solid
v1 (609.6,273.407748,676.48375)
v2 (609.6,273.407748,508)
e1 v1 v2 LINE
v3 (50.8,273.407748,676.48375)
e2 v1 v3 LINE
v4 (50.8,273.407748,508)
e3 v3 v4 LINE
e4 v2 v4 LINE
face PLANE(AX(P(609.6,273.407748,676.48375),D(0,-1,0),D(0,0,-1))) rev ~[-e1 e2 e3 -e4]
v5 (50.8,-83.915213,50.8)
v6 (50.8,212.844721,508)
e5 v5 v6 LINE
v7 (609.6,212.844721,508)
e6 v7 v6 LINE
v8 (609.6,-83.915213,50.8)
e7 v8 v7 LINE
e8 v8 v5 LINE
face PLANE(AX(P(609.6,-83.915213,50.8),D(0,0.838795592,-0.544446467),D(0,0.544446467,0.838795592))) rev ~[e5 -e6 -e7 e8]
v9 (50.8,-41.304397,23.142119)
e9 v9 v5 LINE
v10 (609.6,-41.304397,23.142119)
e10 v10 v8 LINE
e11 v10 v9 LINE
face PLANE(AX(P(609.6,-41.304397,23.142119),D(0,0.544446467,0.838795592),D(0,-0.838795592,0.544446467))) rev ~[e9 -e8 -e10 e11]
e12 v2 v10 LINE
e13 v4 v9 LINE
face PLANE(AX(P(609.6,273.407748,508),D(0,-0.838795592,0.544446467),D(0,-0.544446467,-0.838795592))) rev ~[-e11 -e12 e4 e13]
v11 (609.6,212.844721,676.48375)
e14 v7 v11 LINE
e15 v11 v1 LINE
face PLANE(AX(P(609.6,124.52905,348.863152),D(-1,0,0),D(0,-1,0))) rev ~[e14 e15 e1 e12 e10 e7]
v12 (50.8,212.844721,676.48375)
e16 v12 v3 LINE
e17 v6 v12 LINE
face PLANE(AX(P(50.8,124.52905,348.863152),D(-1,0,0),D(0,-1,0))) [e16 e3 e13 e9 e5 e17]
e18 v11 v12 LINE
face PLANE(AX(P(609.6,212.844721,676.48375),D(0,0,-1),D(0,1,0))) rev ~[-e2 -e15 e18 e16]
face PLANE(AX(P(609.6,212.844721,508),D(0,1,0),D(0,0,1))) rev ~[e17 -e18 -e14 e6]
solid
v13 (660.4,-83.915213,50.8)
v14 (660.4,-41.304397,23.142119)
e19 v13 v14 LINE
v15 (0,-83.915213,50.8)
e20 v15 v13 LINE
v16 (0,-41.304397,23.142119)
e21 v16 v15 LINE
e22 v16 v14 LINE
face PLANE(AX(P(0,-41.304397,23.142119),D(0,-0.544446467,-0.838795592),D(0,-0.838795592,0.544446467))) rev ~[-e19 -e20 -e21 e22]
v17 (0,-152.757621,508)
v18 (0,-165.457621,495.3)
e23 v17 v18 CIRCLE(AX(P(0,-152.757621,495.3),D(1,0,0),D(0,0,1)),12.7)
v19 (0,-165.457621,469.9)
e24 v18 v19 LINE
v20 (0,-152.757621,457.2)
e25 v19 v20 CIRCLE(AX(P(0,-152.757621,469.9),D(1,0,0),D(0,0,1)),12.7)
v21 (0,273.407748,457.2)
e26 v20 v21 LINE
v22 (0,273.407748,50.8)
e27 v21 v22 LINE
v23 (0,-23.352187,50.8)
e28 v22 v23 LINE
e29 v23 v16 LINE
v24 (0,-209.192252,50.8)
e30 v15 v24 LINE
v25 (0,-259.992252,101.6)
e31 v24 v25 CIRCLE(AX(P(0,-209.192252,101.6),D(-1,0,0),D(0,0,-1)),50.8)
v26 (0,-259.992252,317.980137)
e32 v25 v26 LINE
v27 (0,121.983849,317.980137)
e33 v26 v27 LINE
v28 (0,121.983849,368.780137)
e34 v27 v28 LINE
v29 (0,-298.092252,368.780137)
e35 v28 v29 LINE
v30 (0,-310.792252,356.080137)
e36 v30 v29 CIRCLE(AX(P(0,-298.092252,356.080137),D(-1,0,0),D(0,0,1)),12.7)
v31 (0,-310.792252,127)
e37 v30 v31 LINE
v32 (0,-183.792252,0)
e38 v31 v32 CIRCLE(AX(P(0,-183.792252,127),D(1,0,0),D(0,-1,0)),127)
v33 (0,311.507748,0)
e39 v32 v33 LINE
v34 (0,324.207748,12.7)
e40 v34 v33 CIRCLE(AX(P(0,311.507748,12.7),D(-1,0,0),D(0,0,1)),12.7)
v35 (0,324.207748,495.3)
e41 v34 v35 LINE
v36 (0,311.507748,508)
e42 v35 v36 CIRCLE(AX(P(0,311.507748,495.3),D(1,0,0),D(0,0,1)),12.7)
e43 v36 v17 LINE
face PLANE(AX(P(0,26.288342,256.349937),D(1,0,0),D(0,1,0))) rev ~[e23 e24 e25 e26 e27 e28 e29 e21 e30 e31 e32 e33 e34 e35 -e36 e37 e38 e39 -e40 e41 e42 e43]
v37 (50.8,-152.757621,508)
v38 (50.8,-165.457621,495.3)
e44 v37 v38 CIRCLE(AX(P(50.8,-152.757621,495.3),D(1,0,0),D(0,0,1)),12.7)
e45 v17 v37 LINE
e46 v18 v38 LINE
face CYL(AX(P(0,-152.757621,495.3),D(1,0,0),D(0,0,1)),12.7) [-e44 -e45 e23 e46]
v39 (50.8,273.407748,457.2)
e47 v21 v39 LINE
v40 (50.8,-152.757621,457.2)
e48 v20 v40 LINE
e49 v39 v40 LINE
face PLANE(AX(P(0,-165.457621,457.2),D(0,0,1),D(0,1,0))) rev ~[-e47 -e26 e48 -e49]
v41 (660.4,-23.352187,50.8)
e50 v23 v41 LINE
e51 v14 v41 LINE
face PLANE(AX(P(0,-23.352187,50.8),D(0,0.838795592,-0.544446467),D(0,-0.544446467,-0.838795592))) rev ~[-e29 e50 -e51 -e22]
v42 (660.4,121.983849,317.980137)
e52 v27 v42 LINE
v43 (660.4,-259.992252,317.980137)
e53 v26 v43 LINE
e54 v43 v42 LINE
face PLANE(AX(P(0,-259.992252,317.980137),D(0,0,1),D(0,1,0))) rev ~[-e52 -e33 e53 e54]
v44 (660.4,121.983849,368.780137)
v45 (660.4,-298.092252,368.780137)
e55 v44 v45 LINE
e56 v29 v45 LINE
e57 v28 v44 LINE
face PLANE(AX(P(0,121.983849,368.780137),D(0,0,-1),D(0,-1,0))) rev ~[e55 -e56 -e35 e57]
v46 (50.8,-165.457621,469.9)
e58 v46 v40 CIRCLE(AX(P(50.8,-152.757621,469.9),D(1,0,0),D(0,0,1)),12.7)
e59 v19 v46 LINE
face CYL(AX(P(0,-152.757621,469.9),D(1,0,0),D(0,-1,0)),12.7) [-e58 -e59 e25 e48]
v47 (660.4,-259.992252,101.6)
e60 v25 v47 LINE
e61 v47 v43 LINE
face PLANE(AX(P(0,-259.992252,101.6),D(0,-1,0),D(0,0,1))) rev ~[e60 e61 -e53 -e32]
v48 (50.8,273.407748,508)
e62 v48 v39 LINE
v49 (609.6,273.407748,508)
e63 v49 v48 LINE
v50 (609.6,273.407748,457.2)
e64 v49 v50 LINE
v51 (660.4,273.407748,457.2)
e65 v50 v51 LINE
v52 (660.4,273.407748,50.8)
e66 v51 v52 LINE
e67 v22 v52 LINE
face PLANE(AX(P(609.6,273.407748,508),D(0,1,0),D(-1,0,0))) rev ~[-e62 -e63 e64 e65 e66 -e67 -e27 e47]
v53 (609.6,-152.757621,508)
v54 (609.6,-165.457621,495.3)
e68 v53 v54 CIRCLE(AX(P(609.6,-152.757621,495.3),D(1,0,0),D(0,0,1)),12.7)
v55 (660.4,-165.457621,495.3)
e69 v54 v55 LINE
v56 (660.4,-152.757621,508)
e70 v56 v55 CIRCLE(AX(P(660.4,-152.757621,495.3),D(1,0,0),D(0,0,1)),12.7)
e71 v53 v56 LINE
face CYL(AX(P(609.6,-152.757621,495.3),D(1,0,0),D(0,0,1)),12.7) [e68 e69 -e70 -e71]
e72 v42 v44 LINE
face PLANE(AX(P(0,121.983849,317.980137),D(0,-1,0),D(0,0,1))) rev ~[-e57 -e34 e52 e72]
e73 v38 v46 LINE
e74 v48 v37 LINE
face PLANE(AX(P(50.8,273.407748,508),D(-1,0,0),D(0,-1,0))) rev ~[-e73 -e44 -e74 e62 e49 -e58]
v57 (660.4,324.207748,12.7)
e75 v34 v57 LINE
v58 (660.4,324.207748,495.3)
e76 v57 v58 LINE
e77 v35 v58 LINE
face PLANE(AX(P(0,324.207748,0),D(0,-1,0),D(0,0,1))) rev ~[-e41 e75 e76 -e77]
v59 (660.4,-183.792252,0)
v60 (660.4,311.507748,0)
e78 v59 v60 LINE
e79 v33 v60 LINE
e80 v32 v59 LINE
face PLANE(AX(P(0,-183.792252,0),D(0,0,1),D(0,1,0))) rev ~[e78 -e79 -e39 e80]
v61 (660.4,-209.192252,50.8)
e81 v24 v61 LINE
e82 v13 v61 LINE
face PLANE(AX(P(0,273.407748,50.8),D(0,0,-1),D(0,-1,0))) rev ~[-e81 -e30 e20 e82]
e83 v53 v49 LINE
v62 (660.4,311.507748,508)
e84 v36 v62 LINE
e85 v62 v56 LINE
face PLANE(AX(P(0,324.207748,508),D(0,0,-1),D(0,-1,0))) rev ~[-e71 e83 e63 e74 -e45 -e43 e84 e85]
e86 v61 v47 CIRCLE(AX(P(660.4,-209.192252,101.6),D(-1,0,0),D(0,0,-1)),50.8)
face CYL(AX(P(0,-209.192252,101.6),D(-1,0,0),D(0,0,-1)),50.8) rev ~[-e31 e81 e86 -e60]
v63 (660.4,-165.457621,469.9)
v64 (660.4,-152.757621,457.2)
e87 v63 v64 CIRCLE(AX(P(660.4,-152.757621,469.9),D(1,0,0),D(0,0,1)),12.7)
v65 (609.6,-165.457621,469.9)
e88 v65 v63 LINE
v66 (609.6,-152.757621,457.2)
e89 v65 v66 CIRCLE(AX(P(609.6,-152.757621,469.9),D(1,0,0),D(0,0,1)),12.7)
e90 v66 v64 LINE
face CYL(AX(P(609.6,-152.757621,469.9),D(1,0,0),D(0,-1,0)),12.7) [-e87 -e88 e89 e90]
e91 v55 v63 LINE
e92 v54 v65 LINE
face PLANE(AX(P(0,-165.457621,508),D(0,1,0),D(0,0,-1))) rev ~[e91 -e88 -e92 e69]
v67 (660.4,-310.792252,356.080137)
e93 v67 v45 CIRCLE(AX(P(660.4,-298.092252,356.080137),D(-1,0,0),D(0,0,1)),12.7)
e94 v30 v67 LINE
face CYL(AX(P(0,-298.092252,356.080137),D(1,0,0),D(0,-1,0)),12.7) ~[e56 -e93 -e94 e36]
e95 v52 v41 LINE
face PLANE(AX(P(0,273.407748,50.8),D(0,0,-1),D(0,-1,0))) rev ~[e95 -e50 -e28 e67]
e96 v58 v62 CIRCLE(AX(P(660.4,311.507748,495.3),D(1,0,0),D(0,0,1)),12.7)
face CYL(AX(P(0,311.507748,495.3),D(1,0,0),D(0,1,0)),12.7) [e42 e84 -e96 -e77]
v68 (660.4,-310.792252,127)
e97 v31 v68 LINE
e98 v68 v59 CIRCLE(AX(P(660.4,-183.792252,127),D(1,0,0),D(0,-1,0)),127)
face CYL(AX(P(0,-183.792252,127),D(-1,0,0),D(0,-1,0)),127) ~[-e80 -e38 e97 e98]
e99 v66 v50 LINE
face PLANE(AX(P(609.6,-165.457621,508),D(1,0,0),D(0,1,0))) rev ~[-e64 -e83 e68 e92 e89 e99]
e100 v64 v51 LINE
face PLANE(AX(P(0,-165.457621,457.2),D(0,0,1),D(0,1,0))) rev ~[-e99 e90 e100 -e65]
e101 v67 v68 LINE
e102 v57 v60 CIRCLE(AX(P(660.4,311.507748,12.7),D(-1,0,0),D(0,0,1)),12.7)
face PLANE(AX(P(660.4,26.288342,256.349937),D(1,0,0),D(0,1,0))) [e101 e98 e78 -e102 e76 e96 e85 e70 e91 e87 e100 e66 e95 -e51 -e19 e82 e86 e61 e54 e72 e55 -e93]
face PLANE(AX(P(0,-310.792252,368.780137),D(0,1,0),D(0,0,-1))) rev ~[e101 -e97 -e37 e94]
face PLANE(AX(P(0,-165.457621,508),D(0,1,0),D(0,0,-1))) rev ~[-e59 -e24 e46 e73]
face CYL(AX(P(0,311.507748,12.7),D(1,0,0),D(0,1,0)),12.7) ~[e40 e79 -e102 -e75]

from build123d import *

# Parameters (mm, degrees)
F1_DEPTH = 660.4
F3_DEPTH = 86.54255
F5_DEPTH = 558.8
F7_DEPTH = 762
F8_R     = 12.7


# Not quite as in the source:
# - a feature of the source that left no trace in its solid (it failed there, or was rolled back) is left out


with BuildPart() as f1:
    # F0 (on Right) → F1 (new body)
    with BuildSketch(Plane.YZ):
        with BuildLine():
            Line((324.2077479366, 0), (324.2077479366, 508))
            Line((324.2077479366, 508), (-165.4576212168, 508))
            Line((-165.4576212168, 508), (-165.4576212168, 457.2))
            Line((-165.4576212168, 457.2), (273.4077479366, 457.2))
            Line((273.4077479366, 457.2), (273.4077479366, 50.8))
            Line((273.4077479366, 50.8), (-209.1922520634, 50.8))
            ThreePointArc((-209.1922520634, 50.8), (-245.1132765477, 65.6789755157), (-259.9922520634, 101.6))
            Line((-259.9922520634, 101.6), (-259.9922520634, 317.9801367223))
            Line((-259.9922520634, 317.9801367223), (121.9838493824, 317.9801367223))
            Line((121.9838493824, 317.9801367223), (121.9838493824, 368.7801367223))
            Line((121.9838493824, 368.7801367223), (-310.7922520634, 368.7801367223))
            Line((-310.7922520634, 368.7801367223), (-310.7922520634, 127))
            ThreePointArc((-310.7922520634, 127), (-273.5948132741, 37.1974387893), (-183.7922520634, 0))
            Line((-183.7922520634, 0), (324.2077479366, 0))
        make_face()
    extrude(amount=F1_DEPTH)

    # F2 (on face) → F3 (cut)
    with BuildSketch(Plane.XY.offset(508)):
        Polygon((50.8, 273.4077479366), (50.8, -114.6576212168), (50.8, -165.4576212168), (609.6, -165.4576212168), (609.6, -114.6576212168), (609.6, 273.4077479366), align=None)
    extrude(amount=-F3_DEPTH, mode=Mode.SUBTRACT)

    # F6 (on face) → F7 (cut)
    with BuildSketch(Plane(origin=(0, 0, 0), x_dir=(0, -1, 0), z_dir=(-1, 0, 0))):
        Polygon((23.3521865532, 50.8), (41.3043974346, 23.1421194673), (83.9152134845, 50.8), align=None)
    extrude(amount=-F7_DEPTH, mode=Mode.SUBTRACT)

    # F8
    f8_edges = [f1.edges().sort_by_distance(p)[0] for p in [
        (330.2, 324.207748, 0),
        (330.2, 324.207748, 508),
        (25.4, -165.457621, 508),
        (25.4, -165.457621, 457.2),
        (635, -165.457621, 508),
        (635, -165.457621, 457.2),
        (330.2, -310.792252, 368.780137),
    ]]
    fillet(f8_edges, radius=F8_R)


with BuildPart() as f5:
    # F4 (on face) → F5 (new body, through all)
    with BuildSketch(Plane(origin=(609.6, 0, 0), x_dir=(0, -1, 0), z_dir=(-1, 0, 0))):
        Polygon((-273.4077479366, 676.4837503433), (-273.4077479366, 508), (41.3043974346, 23.1421194673), (83.9152134845, 50.8), (-212.8447210052, 508), (-212.8447210052, 676.4837503433), align=None)
    extrude(amount=F5_DEPTH)


solid = Compound([f1.part, f5.part])
